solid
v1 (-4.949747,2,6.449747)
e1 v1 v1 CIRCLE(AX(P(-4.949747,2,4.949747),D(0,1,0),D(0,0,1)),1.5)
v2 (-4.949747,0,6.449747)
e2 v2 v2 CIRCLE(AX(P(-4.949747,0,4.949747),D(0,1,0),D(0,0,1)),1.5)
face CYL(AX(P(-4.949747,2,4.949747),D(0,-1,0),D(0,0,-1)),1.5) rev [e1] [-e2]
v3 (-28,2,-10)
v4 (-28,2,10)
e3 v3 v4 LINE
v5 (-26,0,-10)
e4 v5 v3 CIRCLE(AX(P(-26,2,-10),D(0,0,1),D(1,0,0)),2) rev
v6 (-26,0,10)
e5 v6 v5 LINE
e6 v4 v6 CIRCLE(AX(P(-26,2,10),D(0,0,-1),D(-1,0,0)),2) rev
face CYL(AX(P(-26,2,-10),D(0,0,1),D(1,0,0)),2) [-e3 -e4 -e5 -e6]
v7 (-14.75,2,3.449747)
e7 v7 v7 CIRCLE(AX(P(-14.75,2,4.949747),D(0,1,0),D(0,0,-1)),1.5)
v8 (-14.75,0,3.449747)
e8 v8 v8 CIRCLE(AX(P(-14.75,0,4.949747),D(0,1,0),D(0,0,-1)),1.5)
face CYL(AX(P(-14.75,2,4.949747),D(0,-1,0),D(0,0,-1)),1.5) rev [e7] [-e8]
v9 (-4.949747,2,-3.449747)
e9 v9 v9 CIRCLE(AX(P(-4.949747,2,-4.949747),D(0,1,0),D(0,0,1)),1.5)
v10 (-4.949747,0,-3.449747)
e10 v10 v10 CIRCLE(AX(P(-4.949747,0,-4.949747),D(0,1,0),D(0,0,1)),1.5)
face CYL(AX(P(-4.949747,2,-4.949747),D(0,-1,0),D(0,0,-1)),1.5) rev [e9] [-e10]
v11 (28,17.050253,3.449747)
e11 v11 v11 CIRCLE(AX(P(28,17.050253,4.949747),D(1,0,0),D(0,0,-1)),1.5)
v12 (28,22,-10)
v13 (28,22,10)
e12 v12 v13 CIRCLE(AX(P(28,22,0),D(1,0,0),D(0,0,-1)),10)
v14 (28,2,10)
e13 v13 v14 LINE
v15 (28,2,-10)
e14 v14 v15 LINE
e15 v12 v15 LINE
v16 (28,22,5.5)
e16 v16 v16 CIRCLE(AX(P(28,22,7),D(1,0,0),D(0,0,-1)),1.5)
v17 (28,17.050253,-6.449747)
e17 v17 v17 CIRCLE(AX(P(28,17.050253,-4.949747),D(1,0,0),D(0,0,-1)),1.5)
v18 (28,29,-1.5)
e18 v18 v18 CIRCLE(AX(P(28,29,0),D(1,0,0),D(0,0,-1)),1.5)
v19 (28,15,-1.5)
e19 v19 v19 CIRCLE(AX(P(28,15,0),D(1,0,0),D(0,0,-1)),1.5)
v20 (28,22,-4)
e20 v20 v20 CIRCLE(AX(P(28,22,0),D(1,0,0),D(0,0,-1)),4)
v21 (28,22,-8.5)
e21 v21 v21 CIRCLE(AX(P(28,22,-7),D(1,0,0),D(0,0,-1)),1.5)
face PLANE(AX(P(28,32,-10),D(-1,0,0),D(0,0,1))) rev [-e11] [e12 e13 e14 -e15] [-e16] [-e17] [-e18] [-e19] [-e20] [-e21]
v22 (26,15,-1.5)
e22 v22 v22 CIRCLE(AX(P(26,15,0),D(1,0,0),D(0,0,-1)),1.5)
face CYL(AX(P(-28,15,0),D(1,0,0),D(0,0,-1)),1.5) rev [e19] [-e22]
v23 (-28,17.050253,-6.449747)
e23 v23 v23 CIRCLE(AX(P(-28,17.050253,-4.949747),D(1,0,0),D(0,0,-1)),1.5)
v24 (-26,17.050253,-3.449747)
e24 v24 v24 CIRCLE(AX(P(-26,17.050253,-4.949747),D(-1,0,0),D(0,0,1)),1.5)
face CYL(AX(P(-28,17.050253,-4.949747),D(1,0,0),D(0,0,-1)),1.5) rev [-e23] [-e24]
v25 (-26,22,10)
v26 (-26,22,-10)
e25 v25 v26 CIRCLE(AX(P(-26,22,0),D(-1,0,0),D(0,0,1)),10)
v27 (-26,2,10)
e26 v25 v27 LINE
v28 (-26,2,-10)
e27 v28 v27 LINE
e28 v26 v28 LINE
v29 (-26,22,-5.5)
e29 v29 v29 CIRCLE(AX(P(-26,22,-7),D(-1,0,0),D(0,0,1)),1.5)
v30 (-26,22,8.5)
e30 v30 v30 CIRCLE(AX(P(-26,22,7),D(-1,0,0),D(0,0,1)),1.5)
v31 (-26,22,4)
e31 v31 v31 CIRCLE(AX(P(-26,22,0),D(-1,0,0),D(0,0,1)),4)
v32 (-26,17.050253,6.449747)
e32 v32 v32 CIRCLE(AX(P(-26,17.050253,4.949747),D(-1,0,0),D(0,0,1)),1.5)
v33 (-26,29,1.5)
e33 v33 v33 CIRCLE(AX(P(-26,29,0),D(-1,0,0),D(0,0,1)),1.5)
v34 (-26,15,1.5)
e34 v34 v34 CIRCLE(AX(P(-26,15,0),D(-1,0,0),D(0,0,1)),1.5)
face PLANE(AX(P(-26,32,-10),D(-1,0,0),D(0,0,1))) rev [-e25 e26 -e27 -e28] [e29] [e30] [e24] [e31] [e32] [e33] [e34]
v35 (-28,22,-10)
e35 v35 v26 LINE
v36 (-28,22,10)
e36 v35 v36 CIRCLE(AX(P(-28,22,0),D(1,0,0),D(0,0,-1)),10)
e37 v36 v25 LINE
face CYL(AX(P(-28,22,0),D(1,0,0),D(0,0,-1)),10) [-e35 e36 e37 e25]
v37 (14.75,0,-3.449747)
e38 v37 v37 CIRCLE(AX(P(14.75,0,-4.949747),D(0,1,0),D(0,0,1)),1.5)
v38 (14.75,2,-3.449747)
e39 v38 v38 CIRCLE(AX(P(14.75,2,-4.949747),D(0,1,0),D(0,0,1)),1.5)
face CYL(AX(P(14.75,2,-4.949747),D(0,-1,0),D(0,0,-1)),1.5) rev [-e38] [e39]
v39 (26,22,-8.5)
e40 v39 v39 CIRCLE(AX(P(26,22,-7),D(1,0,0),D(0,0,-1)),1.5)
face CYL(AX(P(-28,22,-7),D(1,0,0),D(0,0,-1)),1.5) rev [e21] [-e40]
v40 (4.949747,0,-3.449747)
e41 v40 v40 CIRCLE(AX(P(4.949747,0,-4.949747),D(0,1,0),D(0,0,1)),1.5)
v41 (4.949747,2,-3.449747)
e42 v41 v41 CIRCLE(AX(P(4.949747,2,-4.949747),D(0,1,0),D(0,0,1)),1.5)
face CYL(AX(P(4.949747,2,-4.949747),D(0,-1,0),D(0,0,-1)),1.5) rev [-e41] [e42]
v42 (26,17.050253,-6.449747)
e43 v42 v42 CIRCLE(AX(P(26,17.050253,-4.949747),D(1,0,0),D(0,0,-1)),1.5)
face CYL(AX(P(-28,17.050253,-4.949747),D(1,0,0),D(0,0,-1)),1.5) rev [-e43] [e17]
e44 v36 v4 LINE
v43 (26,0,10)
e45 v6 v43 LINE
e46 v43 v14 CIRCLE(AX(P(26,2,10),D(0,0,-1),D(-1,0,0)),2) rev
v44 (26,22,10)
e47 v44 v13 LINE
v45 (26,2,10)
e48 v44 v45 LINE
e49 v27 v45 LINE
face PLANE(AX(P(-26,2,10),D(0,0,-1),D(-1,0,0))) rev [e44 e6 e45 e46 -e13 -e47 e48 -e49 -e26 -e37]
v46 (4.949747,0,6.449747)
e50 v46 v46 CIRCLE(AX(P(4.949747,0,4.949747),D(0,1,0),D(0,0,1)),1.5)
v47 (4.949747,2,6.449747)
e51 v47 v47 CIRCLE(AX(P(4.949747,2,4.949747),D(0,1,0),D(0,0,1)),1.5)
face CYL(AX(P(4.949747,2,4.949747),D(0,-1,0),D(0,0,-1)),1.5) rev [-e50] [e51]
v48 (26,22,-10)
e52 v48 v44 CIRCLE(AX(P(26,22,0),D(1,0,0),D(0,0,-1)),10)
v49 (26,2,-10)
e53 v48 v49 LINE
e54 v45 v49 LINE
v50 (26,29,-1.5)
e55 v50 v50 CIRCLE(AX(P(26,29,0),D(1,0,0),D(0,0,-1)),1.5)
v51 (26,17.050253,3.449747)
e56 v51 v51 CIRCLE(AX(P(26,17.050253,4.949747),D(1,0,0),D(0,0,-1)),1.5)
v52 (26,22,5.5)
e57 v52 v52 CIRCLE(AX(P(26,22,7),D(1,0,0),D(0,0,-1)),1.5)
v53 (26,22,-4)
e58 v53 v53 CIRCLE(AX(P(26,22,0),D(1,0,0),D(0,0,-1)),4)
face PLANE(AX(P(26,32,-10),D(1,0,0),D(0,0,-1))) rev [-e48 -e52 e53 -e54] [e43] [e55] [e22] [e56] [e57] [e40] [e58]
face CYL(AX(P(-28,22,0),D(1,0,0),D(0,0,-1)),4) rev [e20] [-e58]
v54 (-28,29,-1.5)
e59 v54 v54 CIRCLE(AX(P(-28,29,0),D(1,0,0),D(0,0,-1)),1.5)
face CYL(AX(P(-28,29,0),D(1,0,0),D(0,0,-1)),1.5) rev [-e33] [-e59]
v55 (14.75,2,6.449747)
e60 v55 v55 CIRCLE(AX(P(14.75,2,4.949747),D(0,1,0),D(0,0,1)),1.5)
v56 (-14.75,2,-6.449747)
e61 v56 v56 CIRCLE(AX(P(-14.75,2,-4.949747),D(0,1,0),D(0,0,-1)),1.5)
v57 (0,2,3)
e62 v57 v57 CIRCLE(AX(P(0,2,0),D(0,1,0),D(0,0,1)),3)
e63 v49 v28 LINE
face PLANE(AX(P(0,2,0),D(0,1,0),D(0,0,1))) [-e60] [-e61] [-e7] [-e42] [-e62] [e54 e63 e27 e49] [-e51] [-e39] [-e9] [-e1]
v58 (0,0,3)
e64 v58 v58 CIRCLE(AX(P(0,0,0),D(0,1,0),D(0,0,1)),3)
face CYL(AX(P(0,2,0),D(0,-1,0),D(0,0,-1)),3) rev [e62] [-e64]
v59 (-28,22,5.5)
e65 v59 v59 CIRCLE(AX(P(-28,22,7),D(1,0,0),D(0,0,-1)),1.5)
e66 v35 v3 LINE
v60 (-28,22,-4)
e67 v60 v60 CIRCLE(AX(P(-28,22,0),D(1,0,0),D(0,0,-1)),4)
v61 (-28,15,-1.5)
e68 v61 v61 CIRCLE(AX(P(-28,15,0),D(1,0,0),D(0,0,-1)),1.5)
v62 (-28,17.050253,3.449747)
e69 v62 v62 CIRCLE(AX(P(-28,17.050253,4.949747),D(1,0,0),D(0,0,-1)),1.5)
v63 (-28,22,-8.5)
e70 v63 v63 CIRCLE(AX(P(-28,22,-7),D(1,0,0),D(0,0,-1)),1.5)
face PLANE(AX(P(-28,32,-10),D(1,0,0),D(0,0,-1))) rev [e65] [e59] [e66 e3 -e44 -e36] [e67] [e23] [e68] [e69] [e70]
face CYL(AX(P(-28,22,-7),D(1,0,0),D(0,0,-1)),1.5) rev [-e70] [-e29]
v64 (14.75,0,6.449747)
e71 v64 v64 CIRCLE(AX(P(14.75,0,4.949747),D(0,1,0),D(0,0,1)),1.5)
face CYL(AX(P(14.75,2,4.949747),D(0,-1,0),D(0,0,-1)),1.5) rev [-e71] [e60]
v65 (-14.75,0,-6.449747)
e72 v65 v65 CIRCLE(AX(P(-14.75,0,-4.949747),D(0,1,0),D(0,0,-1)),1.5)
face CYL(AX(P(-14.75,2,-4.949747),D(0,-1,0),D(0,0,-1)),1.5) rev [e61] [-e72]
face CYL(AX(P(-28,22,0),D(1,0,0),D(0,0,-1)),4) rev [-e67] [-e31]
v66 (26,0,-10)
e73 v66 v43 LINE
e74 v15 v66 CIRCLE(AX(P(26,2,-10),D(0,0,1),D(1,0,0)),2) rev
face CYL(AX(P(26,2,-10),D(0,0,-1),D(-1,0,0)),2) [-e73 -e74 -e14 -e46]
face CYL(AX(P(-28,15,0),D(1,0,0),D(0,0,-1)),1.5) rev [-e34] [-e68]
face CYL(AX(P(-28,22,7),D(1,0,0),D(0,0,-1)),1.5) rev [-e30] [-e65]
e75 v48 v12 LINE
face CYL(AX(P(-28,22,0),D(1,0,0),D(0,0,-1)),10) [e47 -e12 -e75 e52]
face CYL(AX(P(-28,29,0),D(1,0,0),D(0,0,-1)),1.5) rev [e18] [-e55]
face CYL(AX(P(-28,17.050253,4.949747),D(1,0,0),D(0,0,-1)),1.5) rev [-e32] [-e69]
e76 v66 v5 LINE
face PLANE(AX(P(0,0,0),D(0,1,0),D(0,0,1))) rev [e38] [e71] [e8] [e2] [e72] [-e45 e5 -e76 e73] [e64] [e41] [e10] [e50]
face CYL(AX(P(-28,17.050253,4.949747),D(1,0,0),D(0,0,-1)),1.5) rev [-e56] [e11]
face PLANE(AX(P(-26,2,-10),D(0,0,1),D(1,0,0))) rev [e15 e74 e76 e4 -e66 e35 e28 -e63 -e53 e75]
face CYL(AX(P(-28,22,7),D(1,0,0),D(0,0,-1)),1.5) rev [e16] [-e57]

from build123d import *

# Parameters (mm, degrees)
SKETCH_1_W                = 52
SKETCH_1_H                = 20
SKETCH_1_R                = 3
SKETCH_1_R_2              = 1.5
EXTRUDE_1_DEPTH           = 2
SKETCH_2_W                = 2
SKETCH_2_H                = 20
EXTRUDE_2_DEPTH           = 32
CUT_EXTRUDE_START         = -28
CUT_EXTRUDE_1_OUTLINE_R   = 1.5
CUT_EXTRUDE_1_OUTLINE_R_2 = 4
CUT_EXTRUDE_1_DEPTH       = 56
FILLET_1_R                = 2


# Read off the part's stored shape, not the designer's step: 切除-拉伸1
with BuildPart() as part:
    # 草图1 → 凸台-拉伸1 (new body)
    with BuildSketch(Plane(origin=(0, 0, 0), x_dir=(1, 0, 0), z_dir=(0, 1, 0))):
        Rectangle(SKETCH_1_W, SKETCH_1_H)
        with Locations(Location((0, 0, 0), (0, 0, 270))):
            Circle(SKETCH_1_R, mode=Mode.SUBTRACT)
        with Locations(Location((-4.949747468, -4.949747468, 0), (0, 0, 270))):
            Circle(SKETCH_1_R_2, mode=Mode.SUBTRACT)
        with Locations(Location((-4.949747468, 4.949747468, 0), (0, 0, 270))):
            Circle(SKETCH_1_R_2, mode=Mode.SUBTRACT)
        with Locations(Location((4.949747468, 4.949747468, 0), (0, 0, 270))):
            Circle(SKETCH_1_R_2, mode=Mode.SUBTRACT)
        with Locations(Location((4.949747468, -4.949747468, 0), (0, 0, 270))):
            Circle(SKETCH_1_R_2, mode=Mode.SUBTRACT)
        with Locations(Location((14.75, -4.949747468, 0), (0, 0, 270))):
            Circle(SKETCH_1_R_2, mode=Mode.SUBTRACT)
        with Locations(Location((14.75, 4.949747468, 0), (0, 0, 270))):
            Circle(SKETCH_1_R_2, mode=Mode.SUBTRACT)
        with Locations(Location((-14.75, -4.949747468, 0), (0, 0, 90))):
            Circle(SKETCH_1_R_2, mode=Mode.SUBTRACT)
        with Locations(Location((-14.75, 4.949747468, 0), (0, 0, 90))):
            Circle(SKETCH_1_R_2, mode=Mode.SUBTRACT)
    extrude(amount=EXTRUDE_1_DEPTH)

    # 草图2 → 凸台-拉伸2 (add)
    with BuildSketch(Plane(origin=(0, 0, 0), x_dir=(1, 0, 0), z_dir=(0, 1, 0))):
        with Locations((27, 0)):
            Rectangle(SKETCH_2_W, SKETCH_2_H)
        with Locations((-27, 0)):
            Rectangle(SKETCH_2_W, SKETCH_2_H)
    extrude(amount=EXTRUDE_2_DEPTH)

    # 切除-拉伸1 outline → 切除-拉伸1 (cut)
    with BuildSketch(Plane(origin=(0, 0, 0), x_dir=(0, 0, -1), z_dir=(1, 0, 0)).offset(CUT_EXTRUDE_START)):
        with BuildLine():
            ThreePointArc((-10, 22), (-7.071067812, 29.071067812), (0, 32))
            Line((0, 32), (-10, 32))
            Line((-10, 32), (-10, 22))
        make_face()
        with BuildLine():
            ThreePointArc((0, 32), (7.071067812, 29.071067812), (10, 22))
            Line((10, 22), (10, 32))
            Line((10, 32), (0, 32))
        make_face()
        with Locations((0, 29)):
            Circle(CUT_EXTRUDE_1_OUTLINE_R)
        with Locations((0, 15)):
            Circle(CUT_EXTRUDE_1_OUTLINE_R)
        with Locations((0, 22)):
            Circle(CUT_EXTRUDE_1_OUTLINE_R_2)
        with Locations((-7, 22)):
            Circle(CUT_EXTRUDE_1_OUTLINE_R)
        with Locations((7, 22)):
            Circle(CUT_EXTRUDE_1_OUTLINE_R)
        with Locations((-4.949747468, 17.050252532)):
            Circle(CUT_EXTRUDE_1_OUTLINE_R)
        with Locations((4.949747468, 17.050252532)):
            Circle(CUT_EXTRUDE_1_OUTLINE_R)
    extrude(amount=CUT_EXTRUDE_1_DEPTH, mode=Mode.SUBTRACT)

    # 圆角1
    fillet_1_edges = [part.edges().sort_by_distance(p)[0] for p in [
        (28, 0, 0),
        (-28, 0, 0),
    ]]
    fillet(fillet_1_edges, radius=FILLET_1_R)


solid = part.part
